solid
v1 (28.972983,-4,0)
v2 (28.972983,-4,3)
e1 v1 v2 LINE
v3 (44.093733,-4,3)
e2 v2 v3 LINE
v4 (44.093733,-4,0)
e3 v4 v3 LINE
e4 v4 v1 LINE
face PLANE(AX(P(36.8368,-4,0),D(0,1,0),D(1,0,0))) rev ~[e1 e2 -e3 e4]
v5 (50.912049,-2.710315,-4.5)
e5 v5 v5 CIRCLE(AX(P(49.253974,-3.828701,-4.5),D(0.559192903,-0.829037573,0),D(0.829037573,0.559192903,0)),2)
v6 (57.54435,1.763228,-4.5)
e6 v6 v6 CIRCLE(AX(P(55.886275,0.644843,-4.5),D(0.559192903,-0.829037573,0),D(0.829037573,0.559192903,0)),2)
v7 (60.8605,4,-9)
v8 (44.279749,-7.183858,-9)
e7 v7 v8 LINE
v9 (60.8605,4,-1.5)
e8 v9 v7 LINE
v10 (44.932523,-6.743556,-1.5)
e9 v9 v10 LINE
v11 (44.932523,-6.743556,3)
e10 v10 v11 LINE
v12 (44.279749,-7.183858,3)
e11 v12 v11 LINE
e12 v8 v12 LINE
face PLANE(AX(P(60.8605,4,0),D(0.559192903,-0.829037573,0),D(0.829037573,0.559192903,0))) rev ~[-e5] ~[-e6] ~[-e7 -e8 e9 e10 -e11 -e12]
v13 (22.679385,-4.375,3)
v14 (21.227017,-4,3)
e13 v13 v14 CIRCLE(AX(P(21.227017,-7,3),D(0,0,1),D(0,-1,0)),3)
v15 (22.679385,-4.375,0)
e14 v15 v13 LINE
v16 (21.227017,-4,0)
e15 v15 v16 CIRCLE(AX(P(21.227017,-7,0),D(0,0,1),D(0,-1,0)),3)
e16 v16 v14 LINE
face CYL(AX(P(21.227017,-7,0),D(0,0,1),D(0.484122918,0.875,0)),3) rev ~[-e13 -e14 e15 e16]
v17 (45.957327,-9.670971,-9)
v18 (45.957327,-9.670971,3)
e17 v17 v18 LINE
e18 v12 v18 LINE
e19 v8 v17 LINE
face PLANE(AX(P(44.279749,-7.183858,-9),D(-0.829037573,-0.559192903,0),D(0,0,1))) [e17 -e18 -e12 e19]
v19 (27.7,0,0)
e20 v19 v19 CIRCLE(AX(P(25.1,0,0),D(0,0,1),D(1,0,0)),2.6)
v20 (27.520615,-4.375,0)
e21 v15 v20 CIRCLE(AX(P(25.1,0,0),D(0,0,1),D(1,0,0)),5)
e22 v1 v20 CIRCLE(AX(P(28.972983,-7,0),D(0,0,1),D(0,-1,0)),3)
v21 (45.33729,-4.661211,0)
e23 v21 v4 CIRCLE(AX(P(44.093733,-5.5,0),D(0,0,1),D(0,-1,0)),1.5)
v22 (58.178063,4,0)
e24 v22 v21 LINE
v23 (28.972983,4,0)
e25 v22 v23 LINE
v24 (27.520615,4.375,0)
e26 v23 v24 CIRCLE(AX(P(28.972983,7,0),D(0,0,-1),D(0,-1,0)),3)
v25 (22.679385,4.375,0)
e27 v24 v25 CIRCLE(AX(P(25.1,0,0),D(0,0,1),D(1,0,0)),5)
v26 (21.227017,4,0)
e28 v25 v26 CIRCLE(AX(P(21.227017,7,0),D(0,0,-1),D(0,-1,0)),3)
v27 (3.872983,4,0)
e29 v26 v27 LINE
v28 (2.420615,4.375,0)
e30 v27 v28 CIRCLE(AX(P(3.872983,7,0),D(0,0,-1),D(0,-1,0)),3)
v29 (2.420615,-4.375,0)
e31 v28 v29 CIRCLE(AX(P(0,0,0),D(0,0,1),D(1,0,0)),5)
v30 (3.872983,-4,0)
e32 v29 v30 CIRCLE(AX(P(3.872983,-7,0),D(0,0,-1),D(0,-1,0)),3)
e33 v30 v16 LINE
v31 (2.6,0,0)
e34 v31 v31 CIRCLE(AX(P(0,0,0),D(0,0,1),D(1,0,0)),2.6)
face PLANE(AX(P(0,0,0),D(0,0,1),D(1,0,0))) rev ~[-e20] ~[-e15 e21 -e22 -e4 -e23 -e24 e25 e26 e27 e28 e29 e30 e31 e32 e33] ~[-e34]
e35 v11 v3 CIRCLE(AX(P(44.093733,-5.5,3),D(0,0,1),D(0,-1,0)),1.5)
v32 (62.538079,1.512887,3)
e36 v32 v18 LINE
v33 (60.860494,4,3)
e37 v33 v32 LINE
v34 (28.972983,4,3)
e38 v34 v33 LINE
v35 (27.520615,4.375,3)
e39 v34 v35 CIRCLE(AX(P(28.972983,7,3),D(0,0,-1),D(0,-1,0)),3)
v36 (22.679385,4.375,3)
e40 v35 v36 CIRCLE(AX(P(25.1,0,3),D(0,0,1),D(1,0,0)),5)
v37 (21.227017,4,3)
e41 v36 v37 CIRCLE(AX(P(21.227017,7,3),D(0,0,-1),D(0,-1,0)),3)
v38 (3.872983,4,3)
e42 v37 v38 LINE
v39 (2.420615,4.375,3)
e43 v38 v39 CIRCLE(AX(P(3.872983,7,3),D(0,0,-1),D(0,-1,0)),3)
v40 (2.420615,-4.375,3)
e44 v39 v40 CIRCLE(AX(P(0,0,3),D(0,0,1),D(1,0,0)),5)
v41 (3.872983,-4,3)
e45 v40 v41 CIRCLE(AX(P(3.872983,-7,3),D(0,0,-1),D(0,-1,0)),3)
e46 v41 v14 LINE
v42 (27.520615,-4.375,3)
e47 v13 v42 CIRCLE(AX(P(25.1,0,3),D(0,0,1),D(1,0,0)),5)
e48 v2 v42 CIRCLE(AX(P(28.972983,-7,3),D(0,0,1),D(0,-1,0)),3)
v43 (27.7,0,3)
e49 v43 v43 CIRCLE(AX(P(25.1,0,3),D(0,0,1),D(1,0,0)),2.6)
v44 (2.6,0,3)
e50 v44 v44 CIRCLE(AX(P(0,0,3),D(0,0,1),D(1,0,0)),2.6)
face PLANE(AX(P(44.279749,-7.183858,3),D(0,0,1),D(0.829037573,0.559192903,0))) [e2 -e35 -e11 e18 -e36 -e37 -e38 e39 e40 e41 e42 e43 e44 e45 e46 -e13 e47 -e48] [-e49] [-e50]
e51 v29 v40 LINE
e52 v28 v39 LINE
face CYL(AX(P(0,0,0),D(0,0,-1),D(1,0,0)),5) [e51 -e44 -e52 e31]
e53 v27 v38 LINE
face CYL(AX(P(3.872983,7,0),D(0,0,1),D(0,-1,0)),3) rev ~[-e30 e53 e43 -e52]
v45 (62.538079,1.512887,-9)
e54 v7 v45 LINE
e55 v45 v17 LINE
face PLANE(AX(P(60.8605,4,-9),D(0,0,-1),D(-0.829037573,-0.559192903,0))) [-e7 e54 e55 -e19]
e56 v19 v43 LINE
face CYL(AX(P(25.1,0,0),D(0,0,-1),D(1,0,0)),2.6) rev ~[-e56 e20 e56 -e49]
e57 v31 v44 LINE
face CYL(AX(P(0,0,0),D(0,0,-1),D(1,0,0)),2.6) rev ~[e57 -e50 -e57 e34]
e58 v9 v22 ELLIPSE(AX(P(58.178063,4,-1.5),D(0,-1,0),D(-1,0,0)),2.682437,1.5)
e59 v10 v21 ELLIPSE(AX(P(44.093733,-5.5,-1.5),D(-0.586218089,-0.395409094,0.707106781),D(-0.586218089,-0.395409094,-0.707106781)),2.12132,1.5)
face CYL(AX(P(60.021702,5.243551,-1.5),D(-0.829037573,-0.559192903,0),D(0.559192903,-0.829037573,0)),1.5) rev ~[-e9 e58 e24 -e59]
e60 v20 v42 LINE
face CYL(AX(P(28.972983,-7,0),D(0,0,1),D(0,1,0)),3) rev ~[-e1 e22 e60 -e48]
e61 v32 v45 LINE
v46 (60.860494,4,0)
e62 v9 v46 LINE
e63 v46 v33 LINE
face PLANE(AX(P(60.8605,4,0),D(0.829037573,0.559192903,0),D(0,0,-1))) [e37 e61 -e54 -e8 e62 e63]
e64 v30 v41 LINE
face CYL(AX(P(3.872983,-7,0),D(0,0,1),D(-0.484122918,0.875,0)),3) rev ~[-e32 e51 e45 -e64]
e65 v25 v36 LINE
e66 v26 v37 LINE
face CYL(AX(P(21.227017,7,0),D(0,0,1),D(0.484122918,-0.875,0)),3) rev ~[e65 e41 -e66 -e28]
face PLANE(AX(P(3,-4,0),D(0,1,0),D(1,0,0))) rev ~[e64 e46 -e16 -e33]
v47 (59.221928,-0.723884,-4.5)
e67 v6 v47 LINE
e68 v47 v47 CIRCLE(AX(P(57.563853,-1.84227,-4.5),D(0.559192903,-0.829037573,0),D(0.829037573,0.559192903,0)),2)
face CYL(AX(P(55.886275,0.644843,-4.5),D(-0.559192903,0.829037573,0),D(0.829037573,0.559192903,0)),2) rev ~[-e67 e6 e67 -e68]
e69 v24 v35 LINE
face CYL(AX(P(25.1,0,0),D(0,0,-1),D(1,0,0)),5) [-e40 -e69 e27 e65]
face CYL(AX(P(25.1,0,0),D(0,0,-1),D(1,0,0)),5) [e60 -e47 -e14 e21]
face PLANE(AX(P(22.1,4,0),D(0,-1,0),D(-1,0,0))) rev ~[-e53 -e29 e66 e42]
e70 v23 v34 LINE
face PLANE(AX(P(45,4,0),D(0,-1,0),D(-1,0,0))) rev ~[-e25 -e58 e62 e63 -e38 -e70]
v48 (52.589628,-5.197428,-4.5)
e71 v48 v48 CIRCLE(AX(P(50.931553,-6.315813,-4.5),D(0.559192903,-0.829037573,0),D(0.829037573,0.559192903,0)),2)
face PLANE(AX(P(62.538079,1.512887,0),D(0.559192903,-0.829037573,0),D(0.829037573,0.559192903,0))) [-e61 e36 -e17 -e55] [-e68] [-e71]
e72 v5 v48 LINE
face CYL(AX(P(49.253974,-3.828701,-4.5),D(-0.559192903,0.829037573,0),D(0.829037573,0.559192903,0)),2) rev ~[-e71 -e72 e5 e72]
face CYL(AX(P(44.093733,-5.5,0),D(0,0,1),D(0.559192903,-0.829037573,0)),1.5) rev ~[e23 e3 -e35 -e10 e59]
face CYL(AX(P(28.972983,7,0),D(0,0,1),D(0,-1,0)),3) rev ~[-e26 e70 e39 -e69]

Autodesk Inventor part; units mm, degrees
ref_plane "YZ Plane" through (0, 0, 0) normal (1, 0, 0) x (0, 1, 0)
ref_plane "XZ Plane" through (0, 0, 0) normal (0, 1, 0) x (-1, 0, 0)
ref_plane "XY Plane" through (0, 0, 0) normal (0, 0, 1) x (1, 0, 0)
sketch "スケッチ1" plane through (0, 0, 0) normal (0, 0, 1) x (1, 0, 0)
  line L0 (0, 0) -> (45, 0) construction
  line L1 (0, -4) -> (45, -4)
  line L2 (45, 4) -> (0, 4)
  arc A0 (0, 4) -> (0, -4) centre (0, 0) ccw
  arc A1 (45, -4) -> (45, 4) centre (45, 0) ccw
  circle A2 centre (0, 0) radius 2.6
  circle A3 centre (25.1, 0) radius 2.6
  line L3 (36.8368, 4) -> (49, 4)
  line L4 (49, 4) -> (49, -4)
  line L5 (49, -4) -> (36.8368, -4)
  line L6 (36.8368, -4) -> (36.8368, 4)
  circle A4 centre (0, 0) radius 5
  circle A5 centre (25.1, 0) radius 5
  point P0 (22.5, 0)
  dimension "d0" = 4
  dimension "d1" = 45
  dimension "d2" = 5.2
  dimension "d3" = 5.2
  dimension "d4" = 25.1
  dimension "d7" = 12.1632
  dimension "d8" = 8
  dimension "d9" = 4
  dimension "d34" = 10
  dimension "d35" = 10
extrude "押し出し1" add sketch "スケッチ1" along normal blind 3
draft "面の勾配1" angle 56 pull direction (0, -1, 0) faces at (49, -1.3333, 1) fixed edges at (49, -4, 1.5)
ref_plane "作業平面1" through (60.8605, 4, 0) normal (0.5591929, -0.8290376, 0) x (0.8290376, 0.5591929, 0)
sketch "スケッチ3" plane through (60.8605, 4, 0) normal (0.5591929, -0.8290376, 0) x (0.8290376, 0.5591929, 0)
  line L0 (0, -9) -> (-20, -9)
  line L1 (-20, -9) -> (-20, 3)
  line L2 (-20, 3) -> (0, 3)
  line L3 (0, 3) -> (0, -9)
  line L4 (0, 0) -> (0, 3) projected
  circle A0 centre (-14, -4.5) radius 2
  circle A1 centre (-6, -4.5) radius 2
  line L5 (-31.6332, 3) -> (-14.3063, 3) projected
  point P0 (-52.6924, 0)
  point P1 (2.1488, 1.5)
  dimension "d12" = 20
  dimension "d13" = 0
  dimension "d14" = 12
  dimension "d15" = 1.5
  dimension "d21" = 4
  dimension "d22" = 4
  dimension "d25" = 6
  dimension "d26" = 6
  dimension "d29" = 6
  dimension "d30" = 6
  dimension "d39" = 0
extrude "押し出し3" add sketch "スケッチ3" along normal blind 3
fillet "フィレット2" radius 3 6 edges at (3, 4, 1.5) (28.1, 4, 1.5) (22.1, 4, 1.5) (3, -4, 1.5) (28.1, -4, 1.5) (22.1, -4, 1.5)
fillet "フィレット5" radius 1.5 2 edges at (54.9302, 0, 0) (49, -4, 1.5)
equation "\"d3\" = d2"
equation "\"d21\" = d19"
equation "\"d22\" = d19"
equation "\"d26\" = d25"
equation "\"d29\" = d28"
equation "\"d30\" = d24"
equation "\"d28\" = d24"
equation "\"d19\" = 4"
equation "\"d24\" = 6"
properties part number "leg"
